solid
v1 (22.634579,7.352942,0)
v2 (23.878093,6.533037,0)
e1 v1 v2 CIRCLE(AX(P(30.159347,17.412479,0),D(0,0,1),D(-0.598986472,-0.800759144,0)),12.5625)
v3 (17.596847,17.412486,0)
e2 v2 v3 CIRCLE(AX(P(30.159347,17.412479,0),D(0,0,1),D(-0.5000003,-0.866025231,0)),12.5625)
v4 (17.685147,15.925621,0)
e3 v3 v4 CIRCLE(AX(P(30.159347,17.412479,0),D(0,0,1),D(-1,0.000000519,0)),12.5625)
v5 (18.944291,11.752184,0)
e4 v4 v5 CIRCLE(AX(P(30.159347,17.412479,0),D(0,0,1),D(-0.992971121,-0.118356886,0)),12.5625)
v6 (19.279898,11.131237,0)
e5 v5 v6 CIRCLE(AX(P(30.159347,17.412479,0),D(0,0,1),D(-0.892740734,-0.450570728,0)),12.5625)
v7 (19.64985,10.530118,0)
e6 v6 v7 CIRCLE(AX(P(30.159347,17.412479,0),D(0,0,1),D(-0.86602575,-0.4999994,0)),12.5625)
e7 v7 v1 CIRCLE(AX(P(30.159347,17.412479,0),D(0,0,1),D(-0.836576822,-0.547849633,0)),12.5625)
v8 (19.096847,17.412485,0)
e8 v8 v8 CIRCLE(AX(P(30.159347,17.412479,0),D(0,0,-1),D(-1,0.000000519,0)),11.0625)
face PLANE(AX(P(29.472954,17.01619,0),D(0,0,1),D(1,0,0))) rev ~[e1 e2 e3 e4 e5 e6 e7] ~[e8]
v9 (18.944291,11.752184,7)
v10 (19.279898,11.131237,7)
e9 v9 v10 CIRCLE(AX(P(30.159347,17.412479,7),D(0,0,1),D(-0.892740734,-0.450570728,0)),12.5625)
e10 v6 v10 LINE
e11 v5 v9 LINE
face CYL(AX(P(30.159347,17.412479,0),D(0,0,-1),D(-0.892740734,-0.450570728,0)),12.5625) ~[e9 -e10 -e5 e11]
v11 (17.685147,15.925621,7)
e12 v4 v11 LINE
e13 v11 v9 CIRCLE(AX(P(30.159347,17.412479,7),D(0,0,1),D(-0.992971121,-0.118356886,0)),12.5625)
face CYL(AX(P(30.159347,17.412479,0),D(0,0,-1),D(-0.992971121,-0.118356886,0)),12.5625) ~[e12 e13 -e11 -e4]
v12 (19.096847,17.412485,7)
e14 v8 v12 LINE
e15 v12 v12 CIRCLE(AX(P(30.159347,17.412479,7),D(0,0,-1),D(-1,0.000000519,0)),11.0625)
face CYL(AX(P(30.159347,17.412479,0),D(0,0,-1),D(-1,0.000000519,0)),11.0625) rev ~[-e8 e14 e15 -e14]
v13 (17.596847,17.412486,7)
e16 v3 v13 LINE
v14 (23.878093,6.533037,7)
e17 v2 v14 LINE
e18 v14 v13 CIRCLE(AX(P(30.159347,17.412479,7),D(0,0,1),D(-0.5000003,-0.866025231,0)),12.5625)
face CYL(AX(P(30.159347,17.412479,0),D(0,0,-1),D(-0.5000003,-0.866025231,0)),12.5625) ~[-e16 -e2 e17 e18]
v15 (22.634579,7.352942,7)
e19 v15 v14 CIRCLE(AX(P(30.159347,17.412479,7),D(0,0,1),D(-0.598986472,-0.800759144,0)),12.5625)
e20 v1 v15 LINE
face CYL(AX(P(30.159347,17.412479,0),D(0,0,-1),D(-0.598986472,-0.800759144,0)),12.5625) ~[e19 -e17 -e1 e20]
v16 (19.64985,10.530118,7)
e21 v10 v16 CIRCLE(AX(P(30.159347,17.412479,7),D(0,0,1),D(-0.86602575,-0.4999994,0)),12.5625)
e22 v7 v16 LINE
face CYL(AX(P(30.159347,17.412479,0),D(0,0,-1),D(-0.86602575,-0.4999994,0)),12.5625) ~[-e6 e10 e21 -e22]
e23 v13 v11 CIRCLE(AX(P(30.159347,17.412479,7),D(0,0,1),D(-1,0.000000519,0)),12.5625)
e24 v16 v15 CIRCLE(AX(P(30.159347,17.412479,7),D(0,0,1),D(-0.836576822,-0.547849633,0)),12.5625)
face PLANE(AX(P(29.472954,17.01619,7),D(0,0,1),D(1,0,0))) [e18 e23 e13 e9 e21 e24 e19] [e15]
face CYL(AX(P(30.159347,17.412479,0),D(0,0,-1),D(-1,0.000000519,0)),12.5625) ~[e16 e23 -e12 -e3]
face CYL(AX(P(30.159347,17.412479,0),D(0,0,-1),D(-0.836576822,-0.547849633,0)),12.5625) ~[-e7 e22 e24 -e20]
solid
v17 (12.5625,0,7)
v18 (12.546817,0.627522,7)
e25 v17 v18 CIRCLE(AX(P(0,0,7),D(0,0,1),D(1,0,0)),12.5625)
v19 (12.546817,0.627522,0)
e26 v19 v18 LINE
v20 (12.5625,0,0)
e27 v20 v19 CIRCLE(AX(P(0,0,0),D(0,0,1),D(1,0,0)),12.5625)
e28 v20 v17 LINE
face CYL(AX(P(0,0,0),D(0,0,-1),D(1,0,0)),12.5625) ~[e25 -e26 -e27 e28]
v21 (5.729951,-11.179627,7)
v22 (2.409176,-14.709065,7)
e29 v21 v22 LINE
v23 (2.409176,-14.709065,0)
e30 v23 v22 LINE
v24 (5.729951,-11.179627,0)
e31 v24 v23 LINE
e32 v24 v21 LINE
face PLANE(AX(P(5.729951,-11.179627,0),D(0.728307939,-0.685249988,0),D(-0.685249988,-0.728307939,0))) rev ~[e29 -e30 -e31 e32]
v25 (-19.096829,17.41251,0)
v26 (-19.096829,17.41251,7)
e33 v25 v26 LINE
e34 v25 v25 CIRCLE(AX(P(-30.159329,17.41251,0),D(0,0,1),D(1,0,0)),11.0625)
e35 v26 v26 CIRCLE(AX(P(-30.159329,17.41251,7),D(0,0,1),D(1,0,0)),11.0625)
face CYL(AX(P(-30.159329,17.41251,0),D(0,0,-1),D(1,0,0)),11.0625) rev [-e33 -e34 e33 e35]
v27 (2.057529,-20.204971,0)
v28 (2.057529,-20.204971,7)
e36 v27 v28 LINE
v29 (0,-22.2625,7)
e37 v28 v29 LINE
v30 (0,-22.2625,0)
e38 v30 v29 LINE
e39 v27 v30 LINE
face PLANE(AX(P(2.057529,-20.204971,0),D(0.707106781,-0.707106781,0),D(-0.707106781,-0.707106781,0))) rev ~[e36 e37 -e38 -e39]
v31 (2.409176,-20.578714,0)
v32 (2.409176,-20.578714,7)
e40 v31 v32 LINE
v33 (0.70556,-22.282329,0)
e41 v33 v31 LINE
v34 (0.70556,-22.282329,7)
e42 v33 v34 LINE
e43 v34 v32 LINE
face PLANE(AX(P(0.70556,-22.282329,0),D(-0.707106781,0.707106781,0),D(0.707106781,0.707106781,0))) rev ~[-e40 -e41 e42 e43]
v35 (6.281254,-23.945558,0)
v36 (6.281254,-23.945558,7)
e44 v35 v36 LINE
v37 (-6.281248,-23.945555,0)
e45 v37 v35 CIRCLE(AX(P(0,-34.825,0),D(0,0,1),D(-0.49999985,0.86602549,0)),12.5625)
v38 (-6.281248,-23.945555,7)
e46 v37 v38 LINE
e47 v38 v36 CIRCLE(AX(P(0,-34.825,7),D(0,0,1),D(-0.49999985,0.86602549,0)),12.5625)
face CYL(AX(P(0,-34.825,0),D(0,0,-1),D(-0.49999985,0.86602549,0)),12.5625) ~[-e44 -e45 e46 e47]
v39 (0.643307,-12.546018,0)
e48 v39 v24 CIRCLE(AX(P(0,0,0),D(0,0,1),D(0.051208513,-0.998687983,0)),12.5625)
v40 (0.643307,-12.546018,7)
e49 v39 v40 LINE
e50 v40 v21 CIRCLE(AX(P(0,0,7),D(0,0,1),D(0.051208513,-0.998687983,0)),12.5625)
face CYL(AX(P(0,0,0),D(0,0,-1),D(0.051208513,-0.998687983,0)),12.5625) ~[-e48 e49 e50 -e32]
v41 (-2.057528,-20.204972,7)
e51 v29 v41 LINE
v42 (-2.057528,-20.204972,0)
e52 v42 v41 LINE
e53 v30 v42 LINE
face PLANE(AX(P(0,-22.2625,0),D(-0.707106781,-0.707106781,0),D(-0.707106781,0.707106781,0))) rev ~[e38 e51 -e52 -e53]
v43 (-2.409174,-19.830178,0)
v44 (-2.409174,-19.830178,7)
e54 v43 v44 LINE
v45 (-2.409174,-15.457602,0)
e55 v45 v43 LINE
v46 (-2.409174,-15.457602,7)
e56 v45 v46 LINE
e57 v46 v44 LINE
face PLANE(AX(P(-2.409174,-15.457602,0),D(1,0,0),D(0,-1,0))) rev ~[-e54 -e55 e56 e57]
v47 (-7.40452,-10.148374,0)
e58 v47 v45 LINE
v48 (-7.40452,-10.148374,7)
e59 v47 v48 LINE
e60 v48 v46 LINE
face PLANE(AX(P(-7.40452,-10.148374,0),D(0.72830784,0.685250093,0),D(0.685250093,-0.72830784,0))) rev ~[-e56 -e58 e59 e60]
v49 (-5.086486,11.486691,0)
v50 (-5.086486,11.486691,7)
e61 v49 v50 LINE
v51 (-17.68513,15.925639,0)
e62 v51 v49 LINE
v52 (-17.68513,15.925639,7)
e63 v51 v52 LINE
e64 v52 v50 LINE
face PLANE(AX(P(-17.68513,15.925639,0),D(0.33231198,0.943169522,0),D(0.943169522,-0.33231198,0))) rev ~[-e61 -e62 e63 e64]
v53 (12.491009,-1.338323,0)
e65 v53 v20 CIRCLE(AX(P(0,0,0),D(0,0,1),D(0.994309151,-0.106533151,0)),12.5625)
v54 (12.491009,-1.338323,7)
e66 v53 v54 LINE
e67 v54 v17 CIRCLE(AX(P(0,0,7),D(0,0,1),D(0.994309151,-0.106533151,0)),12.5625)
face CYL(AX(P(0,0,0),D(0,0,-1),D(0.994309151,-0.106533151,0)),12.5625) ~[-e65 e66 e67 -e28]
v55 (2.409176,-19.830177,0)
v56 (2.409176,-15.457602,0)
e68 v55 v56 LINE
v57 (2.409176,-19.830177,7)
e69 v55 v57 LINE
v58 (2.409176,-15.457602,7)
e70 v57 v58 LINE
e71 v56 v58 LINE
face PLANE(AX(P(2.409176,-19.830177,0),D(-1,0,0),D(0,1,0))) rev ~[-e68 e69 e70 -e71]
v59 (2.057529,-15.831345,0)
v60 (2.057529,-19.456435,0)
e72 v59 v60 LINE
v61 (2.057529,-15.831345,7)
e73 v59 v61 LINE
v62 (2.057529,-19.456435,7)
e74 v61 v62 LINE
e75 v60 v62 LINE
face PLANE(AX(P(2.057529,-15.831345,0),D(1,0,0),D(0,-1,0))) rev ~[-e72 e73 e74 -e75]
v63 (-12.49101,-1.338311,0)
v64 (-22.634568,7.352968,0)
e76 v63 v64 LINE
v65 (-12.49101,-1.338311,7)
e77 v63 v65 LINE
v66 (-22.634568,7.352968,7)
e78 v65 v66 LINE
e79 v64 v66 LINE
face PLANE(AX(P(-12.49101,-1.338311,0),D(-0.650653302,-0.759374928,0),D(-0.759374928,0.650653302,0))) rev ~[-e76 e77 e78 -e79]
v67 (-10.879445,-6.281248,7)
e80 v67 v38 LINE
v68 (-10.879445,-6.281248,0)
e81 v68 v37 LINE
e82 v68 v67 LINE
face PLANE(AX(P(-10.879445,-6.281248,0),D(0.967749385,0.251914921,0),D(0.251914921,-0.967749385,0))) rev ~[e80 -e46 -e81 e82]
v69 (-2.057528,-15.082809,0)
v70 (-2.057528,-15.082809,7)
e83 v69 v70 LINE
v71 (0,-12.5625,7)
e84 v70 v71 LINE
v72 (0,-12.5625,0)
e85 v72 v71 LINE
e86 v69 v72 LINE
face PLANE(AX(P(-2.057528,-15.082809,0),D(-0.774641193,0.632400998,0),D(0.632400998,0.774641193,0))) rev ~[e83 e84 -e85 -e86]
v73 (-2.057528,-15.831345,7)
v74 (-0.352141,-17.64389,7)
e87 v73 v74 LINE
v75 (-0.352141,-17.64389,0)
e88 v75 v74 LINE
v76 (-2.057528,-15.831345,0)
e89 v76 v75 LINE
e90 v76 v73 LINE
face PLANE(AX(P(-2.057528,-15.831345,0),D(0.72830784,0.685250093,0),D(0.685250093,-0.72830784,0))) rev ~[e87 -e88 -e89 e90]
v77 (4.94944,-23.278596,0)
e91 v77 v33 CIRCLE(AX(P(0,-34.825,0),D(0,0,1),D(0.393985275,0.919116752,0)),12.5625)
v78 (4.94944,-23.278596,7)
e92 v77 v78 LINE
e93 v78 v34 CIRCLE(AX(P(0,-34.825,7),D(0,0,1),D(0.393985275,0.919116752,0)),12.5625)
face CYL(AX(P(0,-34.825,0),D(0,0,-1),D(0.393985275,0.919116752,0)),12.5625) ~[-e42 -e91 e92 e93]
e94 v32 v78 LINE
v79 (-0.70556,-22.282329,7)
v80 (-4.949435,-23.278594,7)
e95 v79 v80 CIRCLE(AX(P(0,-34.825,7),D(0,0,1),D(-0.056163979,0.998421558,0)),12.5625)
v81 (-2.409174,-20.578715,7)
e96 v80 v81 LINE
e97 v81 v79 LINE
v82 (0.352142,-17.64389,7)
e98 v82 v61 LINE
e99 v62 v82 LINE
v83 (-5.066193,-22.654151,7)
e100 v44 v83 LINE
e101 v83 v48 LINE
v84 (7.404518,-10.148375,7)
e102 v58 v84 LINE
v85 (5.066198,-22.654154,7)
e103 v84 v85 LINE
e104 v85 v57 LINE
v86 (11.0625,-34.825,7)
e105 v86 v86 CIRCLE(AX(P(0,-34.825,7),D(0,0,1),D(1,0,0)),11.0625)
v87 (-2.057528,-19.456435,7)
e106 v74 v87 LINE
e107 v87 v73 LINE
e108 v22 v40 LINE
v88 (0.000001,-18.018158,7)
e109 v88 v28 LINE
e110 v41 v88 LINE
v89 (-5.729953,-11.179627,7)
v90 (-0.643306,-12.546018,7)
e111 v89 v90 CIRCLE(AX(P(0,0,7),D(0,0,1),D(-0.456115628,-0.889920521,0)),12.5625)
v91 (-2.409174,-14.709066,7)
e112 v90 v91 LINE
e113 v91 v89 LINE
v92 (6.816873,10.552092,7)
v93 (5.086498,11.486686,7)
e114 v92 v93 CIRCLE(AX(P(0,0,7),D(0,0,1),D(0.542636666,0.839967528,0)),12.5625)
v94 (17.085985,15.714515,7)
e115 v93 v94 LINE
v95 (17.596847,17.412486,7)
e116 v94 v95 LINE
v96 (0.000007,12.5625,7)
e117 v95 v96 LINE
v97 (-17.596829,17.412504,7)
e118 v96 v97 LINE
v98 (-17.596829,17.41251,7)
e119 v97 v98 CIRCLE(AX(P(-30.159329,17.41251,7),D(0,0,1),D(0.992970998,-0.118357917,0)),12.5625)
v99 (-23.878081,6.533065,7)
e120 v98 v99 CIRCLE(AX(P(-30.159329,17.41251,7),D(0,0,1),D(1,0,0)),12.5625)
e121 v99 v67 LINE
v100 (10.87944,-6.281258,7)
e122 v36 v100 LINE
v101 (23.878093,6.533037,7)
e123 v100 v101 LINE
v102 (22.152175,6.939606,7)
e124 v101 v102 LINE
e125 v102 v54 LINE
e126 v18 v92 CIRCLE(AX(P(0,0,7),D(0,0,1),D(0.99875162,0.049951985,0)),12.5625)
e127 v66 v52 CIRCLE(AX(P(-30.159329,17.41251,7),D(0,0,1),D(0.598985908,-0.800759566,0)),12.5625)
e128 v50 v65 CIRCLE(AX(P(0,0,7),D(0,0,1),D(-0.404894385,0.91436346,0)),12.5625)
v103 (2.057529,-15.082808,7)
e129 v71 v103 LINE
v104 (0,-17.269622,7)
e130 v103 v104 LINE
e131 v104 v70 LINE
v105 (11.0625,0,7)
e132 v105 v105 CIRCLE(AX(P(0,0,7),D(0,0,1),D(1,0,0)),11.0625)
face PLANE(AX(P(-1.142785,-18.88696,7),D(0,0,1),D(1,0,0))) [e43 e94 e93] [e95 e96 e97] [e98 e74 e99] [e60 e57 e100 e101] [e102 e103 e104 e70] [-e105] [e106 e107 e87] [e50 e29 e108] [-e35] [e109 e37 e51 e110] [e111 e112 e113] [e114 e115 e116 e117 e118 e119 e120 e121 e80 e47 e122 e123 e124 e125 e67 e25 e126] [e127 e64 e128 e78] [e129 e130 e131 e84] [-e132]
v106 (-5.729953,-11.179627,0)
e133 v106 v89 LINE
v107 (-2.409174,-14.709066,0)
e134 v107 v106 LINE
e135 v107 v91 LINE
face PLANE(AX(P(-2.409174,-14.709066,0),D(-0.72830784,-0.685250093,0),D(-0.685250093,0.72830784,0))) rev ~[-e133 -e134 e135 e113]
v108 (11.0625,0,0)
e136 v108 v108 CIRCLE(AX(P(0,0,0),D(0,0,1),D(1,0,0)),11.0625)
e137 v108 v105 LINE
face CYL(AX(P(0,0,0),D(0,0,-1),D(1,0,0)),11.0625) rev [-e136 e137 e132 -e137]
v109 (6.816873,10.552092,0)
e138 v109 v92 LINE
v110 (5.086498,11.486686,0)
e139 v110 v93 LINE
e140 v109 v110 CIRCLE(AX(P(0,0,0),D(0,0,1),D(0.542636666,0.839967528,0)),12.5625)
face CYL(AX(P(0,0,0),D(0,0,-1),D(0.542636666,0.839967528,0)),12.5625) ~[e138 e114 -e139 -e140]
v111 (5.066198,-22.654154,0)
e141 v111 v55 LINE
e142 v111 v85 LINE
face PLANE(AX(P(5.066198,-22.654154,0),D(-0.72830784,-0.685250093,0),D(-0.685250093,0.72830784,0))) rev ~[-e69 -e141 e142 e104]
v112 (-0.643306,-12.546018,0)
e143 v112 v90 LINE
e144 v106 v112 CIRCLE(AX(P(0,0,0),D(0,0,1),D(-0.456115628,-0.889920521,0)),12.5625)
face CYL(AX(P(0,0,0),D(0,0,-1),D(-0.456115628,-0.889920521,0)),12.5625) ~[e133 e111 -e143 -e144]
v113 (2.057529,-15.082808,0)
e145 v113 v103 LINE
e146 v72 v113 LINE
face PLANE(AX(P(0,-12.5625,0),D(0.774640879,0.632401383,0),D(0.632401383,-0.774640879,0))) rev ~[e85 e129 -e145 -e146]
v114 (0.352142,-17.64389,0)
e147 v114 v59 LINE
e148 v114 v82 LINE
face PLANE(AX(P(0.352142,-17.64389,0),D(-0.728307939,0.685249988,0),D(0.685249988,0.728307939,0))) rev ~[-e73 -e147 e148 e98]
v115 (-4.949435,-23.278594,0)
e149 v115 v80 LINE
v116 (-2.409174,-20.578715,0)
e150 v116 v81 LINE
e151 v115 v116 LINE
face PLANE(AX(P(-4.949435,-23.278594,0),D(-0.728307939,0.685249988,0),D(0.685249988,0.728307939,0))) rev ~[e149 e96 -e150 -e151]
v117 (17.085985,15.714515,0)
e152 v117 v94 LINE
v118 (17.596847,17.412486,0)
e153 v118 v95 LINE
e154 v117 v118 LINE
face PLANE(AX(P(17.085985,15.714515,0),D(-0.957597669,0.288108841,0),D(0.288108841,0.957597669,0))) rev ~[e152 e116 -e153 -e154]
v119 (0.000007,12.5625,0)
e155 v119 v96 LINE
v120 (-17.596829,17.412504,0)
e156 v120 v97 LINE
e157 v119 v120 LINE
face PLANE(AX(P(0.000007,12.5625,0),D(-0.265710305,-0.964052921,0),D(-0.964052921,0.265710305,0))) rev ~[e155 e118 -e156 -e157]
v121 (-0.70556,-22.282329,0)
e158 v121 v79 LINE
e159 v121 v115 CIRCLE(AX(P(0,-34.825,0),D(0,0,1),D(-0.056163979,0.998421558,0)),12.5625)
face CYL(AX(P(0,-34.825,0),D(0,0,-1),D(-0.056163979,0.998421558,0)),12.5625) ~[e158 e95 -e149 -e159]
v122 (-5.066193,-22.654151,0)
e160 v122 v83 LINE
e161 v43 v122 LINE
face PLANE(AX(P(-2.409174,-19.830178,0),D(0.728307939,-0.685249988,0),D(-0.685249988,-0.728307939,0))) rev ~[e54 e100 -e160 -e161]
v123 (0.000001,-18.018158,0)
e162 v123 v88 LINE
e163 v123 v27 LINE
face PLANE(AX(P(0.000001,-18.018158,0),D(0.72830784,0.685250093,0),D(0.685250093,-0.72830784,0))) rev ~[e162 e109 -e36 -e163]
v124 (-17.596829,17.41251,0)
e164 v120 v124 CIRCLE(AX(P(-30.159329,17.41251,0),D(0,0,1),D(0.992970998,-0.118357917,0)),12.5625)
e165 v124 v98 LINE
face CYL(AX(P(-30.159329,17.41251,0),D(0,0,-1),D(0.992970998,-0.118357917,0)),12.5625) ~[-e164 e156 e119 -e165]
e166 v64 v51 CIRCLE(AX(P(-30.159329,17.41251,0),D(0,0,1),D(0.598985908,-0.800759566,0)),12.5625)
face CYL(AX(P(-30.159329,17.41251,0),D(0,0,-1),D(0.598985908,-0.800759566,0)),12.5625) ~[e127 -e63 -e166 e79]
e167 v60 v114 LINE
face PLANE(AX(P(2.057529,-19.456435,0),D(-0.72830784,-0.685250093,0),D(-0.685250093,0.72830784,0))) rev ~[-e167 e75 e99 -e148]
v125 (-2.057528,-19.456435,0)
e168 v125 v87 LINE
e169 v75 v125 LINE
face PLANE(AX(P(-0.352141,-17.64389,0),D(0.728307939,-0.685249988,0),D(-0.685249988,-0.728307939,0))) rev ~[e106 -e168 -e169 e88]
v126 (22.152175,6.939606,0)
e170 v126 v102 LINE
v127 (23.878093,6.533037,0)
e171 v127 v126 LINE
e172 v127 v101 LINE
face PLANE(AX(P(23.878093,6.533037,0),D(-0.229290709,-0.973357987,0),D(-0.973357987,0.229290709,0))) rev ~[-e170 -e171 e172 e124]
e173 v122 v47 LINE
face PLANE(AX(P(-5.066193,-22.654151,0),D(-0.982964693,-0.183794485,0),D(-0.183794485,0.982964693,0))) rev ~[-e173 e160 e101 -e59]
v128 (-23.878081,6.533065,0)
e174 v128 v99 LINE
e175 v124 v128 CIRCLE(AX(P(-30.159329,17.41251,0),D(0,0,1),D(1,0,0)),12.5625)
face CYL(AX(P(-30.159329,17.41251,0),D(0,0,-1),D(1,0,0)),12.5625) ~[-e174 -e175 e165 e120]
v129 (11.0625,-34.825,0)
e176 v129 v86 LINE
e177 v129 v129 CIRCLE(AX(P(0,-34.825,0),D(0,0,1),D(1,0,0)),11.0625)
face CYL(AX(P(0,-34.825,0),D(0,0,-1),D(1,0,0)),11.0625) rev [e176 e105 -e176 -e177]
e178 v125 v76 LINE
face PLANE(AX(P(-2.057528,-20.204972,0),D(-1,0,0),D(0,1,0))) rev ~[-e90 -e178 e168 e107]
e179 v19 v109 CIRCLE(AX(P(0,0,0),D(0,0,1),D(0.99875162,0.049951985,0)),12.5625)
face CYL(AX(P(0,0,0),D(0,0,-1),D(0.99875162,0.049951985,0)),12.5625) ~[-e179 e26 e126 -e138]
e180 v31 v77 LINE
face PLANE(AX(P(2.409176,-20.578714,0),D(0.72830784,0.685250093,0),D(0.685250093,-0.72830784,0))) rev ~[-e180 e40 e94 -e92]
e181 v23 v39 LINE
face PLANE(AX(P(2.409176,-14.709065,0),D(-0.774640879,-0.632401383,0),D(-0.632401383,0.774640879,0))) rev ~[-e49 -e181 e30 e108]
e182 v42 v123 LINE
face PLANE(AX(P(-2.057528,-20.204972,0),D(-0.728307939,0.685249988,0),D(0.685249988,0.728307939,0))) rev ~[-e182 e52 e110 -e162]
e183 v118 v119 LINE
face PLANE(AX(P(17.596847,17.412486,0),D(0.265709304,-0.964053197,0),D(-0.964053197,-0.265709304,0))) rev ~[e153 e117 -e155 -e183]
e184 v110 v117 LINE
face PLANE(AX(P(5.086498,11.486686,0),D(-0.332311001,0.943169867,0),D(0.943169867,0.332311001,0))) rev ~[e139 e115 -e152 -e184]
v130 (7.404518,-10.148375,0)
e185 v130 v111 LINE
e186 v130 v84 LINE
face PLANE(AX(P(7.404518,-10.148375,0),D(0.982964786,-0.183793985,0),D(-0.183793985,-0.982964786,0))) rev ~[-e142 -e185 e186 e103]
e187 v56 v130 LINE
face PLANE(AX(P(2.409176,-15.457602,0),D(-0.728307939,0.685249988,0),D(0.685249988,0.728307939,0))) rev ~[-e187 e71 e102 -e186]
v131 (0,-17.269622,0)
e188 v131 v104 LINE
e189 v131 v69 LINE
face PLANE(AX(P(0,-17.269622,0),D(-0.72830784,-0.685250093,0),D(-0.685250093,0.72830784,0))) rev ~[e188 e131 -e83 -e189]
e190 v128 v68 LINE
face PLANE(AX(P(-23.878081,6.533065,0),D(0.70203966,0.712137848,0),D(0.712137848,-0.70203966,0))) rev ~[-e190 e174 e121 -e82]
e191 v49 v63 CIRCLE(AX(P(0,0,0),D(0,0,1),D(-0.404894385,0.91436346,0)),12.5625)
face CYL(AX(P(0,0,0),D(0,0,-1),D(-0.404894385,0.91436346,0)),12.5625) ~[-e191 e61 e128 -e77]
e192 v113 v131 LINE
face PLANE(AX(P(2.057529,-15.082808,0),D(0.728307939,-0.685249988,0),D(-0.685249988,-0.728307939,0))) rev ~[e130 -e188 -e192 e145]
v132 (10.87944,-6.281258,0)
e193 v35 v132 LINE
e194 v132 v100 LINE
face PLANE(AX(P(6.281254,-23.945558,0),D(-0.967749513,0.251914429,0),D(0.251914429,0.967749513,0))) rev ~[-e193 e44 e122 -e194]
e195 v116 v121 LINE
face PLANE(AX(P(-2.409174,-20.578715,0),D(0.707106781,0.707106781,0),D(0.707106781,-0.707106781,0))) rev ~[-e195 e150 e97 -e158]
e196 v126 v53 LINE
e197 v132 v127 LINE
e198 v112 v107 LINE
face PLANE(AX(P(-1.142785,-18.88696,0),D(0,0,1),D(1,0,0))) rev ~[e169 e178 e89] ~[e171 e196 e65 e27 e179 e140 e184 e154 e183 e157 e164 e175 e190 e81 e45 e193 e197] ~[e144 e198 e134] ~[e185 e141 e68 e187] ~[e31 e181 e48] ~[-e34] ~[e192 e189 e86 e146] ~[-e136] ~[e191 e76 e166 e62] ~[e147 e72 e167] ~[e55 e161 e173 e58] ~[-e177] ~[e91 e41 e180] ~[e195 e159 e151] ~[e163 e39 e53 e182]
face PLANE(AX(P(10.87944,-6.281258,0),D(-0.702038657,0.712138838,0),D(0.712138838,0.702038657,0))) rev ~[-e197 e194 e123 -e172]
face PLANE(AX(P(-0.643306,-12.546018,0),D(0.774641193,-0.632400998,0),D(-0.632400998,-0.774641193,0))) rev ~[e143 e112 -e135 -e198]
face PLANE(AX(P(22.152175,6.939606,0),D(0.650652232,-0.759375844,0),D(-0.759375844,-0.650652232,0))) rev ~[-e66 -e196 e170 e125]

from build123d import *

# Parameters (mm, degrees)
F0_R     = 11.0625
F1_DEPTH = 7
F2_DEPTH = 7
F3_DEPTH = 7


# Not quite as in the source:
# - ends of sketch curves that miss each other by under 0.0002 mm in the source are joined


with BuildPart() as f1:
    # F0 (on Top) → F1 (new body)
    with BuildSketch(Plane.XY):
        with BuildLine():
            ThreePointArc((-22.6345681923, 7.3529683934), (-23.2441620991, 6.9245708082), (-23.878080543, 6.5330652161))
            Line((-23.878080543, 6.5330652161), (-10.879445222, -6.2812481173))
            ThreePointArc((-10.879445222, -6.2812481173), (-11.9437306049, -3.894060283), (-12.4910099647, -1.3383109926))
            Line((-12.4910099647, -1.3383109926), (-22.6345681923, 7.3529683934))
        make_face()
        with BuildLine():
            ThreePointArc((-17.6851304944, 15.925639103), (-17.6189235491, 16.6677649143), (-17.5968286604, 17.4125104381))
            ThreePointArc((-17.5968286604, 17.4125104381), (-41.0387722519, 23.6937613794), (-23.878080543, 6.5330652161))
            ThreePointArc((-23.878080543, 6.5330652161), (-23.2441620991, 6.9245708082), (-22.6345681923, 7.3529683934))
            ThreePointArc((-22.6345681923, 7.3529683934), (-19.2798866993, 11.1312566727), (-17.6851304944, 15.925639103))
        make_face()
        with Locations((-30.1593286604, 17.4125104381)):
            Circle(F0_R, mode=Mode.SUBTRACT)
        with BuildLine():
            Line((6.5218e-06, 12.5625), (-17.5968286604, 17.4125039163))
            ThreePointArc((-17.5968286604, 17.4125039163), (-17.6189235491, 16.6677649143), (-17.6851304944, 15.925639103))
            Line((-17.6851304944, 15.925639103), (-5.0864857136, 11.4866909655))
            ThreePointArc((-5.0864857136, 11.4866909655), (-2.5995016661, 12.2906060607), (6.5218e-06, 12.5625))
        make_face()
        with BuildLine():
            ThreePointArc((5.0864976401, 11.4866856842), (2.5995144273, 12.2906033616), (6.5218e-06, 12.5625))
            ThreePointArc((6.5218e-06, 12.5625), (-2.5995016661, 12.2906060607), (-5.0864857136, 11.4866909655))
            ThreePointArc((-5.0864857136, 11.4866909655), (-10.8794419611, 6.2812537653), (-12.4910099647, -1.3383109926))
            ThreePointArc((-12.4910099647, -1.3383109926), (-11.9437306049, -3.894060283), (-10.879445222, -6.2812481173))
            ThreePointArc((-10.879445222, -6.2812481173), (-9.3442233374, -8.3965407443), (-7.4045198124, -10.1483738893))
            ThreePointArc((-7.4045198124, -10.1483738893), (-6.5874472871, -10.6968193632), (-5.729952579, -11.1796265453))
            ThreePointArc((-5.729952579, -11.1796265453), (-3.2590434265, -12.1323963912), (-0.6433064868, -12.546017815))
            ThreePointArc((-0.6433064868, -12.546017815), (-0.3217587988, -12.5583787777), (0, -12.5625))
            ThreePointArc((0, -12.5625), (0.3217590306, -12.5583787718), (0.64330695, -12.5460177912))
            ThreePointArc((0.64330695, -12.5460177912), (3.2590426993, -12.1323965866), (5.7299508261, -11.1796274437))
            ThreePointArc((5.7299508261, -11.1796274437), (6.5874457148, -10.6968203315), (7.4045184202, -10.1483749051))
            ThreePointArc((7.4045184202, -10.1483749051), (9.3442190031, -8.3965455678), (10.879439599, -6.2812578567))
            ThreePointArc((10.879439599, -6.2812578567), (11.9437270351, -3.894071232), (12.491008709, -1.3383227122))
            ThreePointArc((12.491008709, -1.3383227122), (12.5446144452, -0.6701154167), (12.5625, 0))
            ThreePointArc((12.5625, 0), (12.5585786957, 0.3138588742), (12.546817231, 0.6275218102))
            ThreePointArc((12.546817231, 0.6275218102), (10.8794485026, 6.2812424352), (6.816873119, 10.5520920736))
            ThreePointArc((6.816873119, 10.5520920736), (5.9700021073, 11.0533018184), (5.0864976401, 11.4866856842))
        make_face()
        Circle(F0_R, mode=Mode.SUBTRACT)
        with BuildLine():
            Line((17.5968467396, 17.4124856456), (6.5218e-06, 12.5625))
            ThreePointArc((6.5218e-06, 12.5625), (2.5995144273, 12.2906033616), (5.0864976401, 11.4866856842))
            Line((5.0864976401, 11.4866856842), (17.0859847543, 15.7145153795))
            Line((17.0859847543, 15.7145153795), (17.5968467396, 17.4124856456))
        make_face()
        with BuildLine():
            Line((10.879439599, -6.2812578567), (23.8780929743, 6.5330371628))
            Line((23.8780929743, 6.5330371628), (22.1521745654, 6.9396060316))
            Line((22.1521745654, 6.9396060316), (12.491008709, -1.3383227122))
            ThreePointArc((12.491008709, -1.3383227122), (11.9437270351, -3.894071232), (10.879439599, -6.2812578567))
        make_face()
        with BuildLine():
            ThreePointArc((-4.9494347308, -23.2785935419), (-5.6252349846, -23.5923183247), (-6.2812481173, -23.945554778))
            ThreePointArc((-6.2812481173, -23.945554778), (-6.2812509413, -45.7044435916), (12.5625, -34.825))
            ThreePointArc((12.5625, -34.825), (10.879445222, -28.5437518827), (6.2812537653, -23.9455580389))
            ThreePointArc((6.2812537653, -23.9455580389), (5.6252404686, -23.5923210711), (4.949440011, -23.2785958053))
            ThreePointArc((4.949440011, -23.2785958053), (2.8710438959, -22.5949749306), (0.7055599905, -22.282329178))
            ThreePointArc((0.7055599905, -22.282329178), (0.3529192884, -22.267458273), (0, -22.2625))
            ThreePointArc((0, -22.2625), (-0.3529192884, -22.267458273), (-0.7055599905, -22.282329178))
            ThreePointArc((-0.7055599905, -22.282329178), (-2.8710410995, -22.5949742742), (-4.9494347308, -23.2785935419))
        make_face()
        with Locations((0, -34.825)):
            Circle(F0_R, mode=Mode.SUBTRACT)
        with BuildLine():
            Line((6.2812537653, -23.9455580389), (10.879439599, -6.2812578567))
            ThreePointArc((10.879439599, -6.2812578567), (9.3442190031, -8.3965455678), (7.4045184202, -10.1483749051))
            Line((7.4045184202, -10.1483749051), (5.0661976857, -22.6541538095))
            Line((5.0661976857, -22.6541538095), (6.2812537653, -23.9455580389))
        make_face()
        with BuildLine():
            ThreePointArc((-7.4045198124, -10.1483738893), (-9.3442233374, -8.3965407443), (-10.879445222, -6.2812481173))
            Line((-10.879445222, -6.2812481173), (-6.2812481173, -23.945554778))
            Line((-6.2812481173, -23.945554778), (-5.0661928327, -22.6541510186))
            Line((-5.0661928327, -22.6541510186), (-7.4045198124, -10.1483738893))
        make_face()
        with BuildLine():
            ThreePointArc((4.949440011, -23.2785958053), (5.6252404686, -23.5923210711), (6.2812537653, -23.9455580389))
            Line((6.2812537653, -23.9455580389), (5.0661976857, -22.6541538095))
            Line((5.0661976857, -22.6541538095), (4.949440011, -23.2785958053))
        make_face()
        with BuildLine():
            Line((-5.0661928327, -22.6541510186), (-6.2812481173, -23.945554778))
            ThreePointArc((-6.2812481173, -23.945554778), (-5.6252349846, -23.5923183247), (-4.9494347308, -23.2785935419))
            Line((-4.9494347308, -23.2785935419), (-5.0661928327, -22.6541510186))
        make_face()
    extrude(amount=F1_DEPTH)

    # F0 (on Top) → F2 (join)
    with BuildSketch(Plane.XY):
        with BuildLine():
            Line((2.0575288422, -20.2049711578), (0, -22.2625))
            ThreePointArc((0, -22.2625), (0.3529192884, -22.267458273), (0.7055599905, -22.282329178))
            Line((0.7055599905, -22.282329178), (2.4091755513, -20.5787136171))
            Line((2.4091755513, -20.5787136171), (2.0575288422, -20.2049711578))
        make_face()
        with BuildLine():
            Line((-2.4091743081, -20.5787148604), (-0.7055599905, -22.282329178))
            ThreePointArc((-0.7055599905, -22.282329178), (-0.3529192884, -22.267458273), (0, -22.2625))
            Line((0, -22.2625), (-2.0575276516, -20.2049723484))
            Line((-2.0575276516, -20.2049723484), (-2.4091743081, -20.5787148604))
        make_face()
        Polygon((-2.0575276516, -19.4564351822), (-2.4091743081, -19.8301776941), (-2.4091743081, -20.5787148604), (-2.0575276516, -20.2049723484), align=None)
        Polygon((2.0575288422, -19.456435009), (2.0575288422, -20.2049711578), (2.4091755513, -20.5787136171), (2.4091755513, -19.8301774684), align=None)
        Polygon((2.0575288422, -15.8313446679), (2.4091755513, -15.4576021), (2.4091755513, -14.7090649338), (2.0575288422, -15.0828075016), align=None)
        Polygon((-2.4091743081, -14.709066195), (-2.4091743081, -15.4576023437), (-2.0575276516, -15.8313447471), (-2.0575276516, -15.0828085984), align=None)
        Polygon((-2.0575276516, -15.8313447471), (-2.4091743081, -15.4576023437), (-2.4091743081, -19.8301776941), (-2.0575276516, -19.4564351822), align=None)
        Polygon((2.4091755513, -19.8301774684), (2.4091755513, -15.4576021), (2.0575288422, -15.8313446679), (2.0575288422, -19.456435009), align=None)
        with BuildLine():
            ThreePointArc((0, -12.5625), (-0.3217587988, -12.5583787777), (-0.6433064868, -12.546017815))
            Line((-0.6433064868, -12.546017815), (-2.4091743081, -14.709066195))
            Line((-2.4091743081, -14.709066195), (-2.0575276516, -15.0828085984))
            Line((-2.0575276516, -15.0828085984), (0, -12.5625))
        make_face()
        with BuildLine():
            ThreePointArc((0.64330695, -12.5460177912), (0.3217590306, -12.5583787718), (0, -12.5625))
            Line((0, -12.5625), (2.0575288422, -15.0828075016))
            Line((2.0575288422, -15.0828075016), (2.4091755513, -14.7090649338))
            Line((2.4091755513, -14.7090649338), (0.64330695, -12.5460177912))
        make_face()
        Polygon((2.4091755513, -20.5787136171), (4.949440011, -23.2785958053), (5.0661976857, -22.6541538095), (2.4091755513, -19.8301774684), align=None)
        Polygon((-2.4091743081, -19.8301776941), (-5.0661928327, -22.6541510186), (-4.9494347308, -23.2785935419), (-2.4091743081, -20.5787148604), align=None)
        with BuildLine():
            Line((2.4091755513, -15.4576021), (7.4045184202, -10.1483749051))
            ThreePointArc((7.4045184202, -10.1483749051), (6.5874457148, -10.6968203315), (5.7299508261, -11.1796274437))
            Line((5.7299508261, -11.1796274437), (2.4091755513, -14.7090649338))
            Line((2.4091755513, -14.7090649338), (2.4091755513, -15.4576021))
        make_face()
        with BuildLine():
            ThreePointArc((-5.729952579, -11.1796265453), (-6.5874472871, -10.6968193632), (-7.4045198124, -10.1483738893))
            Line((-7.4045198124, -10.1483738893), (-2.4091743081, -15.4576023437))
            Line((-2.4091743081, -15.4576023437), (-2.4091743081, -14.709066195))
            Line((-2.4091743081, -14.709066195), (-5.729952579, -11.1796265453))
        make_face()
        Polygon((0.3521420553, -17.6438901016), (8.567e-07, -18.0181582303), (2.0575288422, -20.2049711578), (2.0575288422, -19.456435009), align=None)
        Polygon((3.781e-07, -17.2696215728), (-0.3521408205, -17.6438897015), (8.567e-07, -18.0181582303), (0.3521420553, -17.6438901016), align=None)
        Polygon((2.0575288422, -15.8313446679), (2.0575288422, -15.0828075016), (3.781e-07, -17.2696215728), (0.3521420553, -17.6438901016), align=None)
    extrude(amount=F2_DEPTH)

    # F0 (on Top) → F3 (join)
    with BuildSketch(Plane.XY):
        Polygon((-0.3521408205, -17.6438897015), (-2.0575276516, -19.4564351822), (-2.0575276516, -20.2049723484), (8.567e-07, -18.0181582303), align=None)
        Polygon((-2.0575276516, -15.0828085984), (-2.0575276516, -15.8313447471), (-0.3521408205, -17.6438897015), (3.781e-07, -17.2696215728), align=None)
    extrude(amount=F3_DEPTH)


with BuildPart() as f1b:
    # F0 (on Top) → F1, piece 2 (new body)
    with BuildSketch(Plane.XY):
        with BuildLine():
            ThreePointArc((42.7218467396, 17.4124791239), (30.1593500005, 29.9749791239), (17.5968467396, 17.4124856456))
            ThreePointArc((17.5968467396, 17.4124856456), (17.6189410484, 16.6677433655), (17.6851470299, 15.9256207407))
            ThreePointArc((17.6851470299, 15.9256207407), (18.1323107106, 13.7838691135), (18.9442912632, 11.7521843515))
            ThreePointArc((18.9442912632, 11.7521843515), (19.1077328162, 11.4393529795), (19.2798982567, 11.1312366546))
            ThreePointArc((19.2798982567, 11.1312366546), (19.4606516814, 10.8280785967), (19.6498504077, 10.5301181118))
            ThreePointArc((19.6498504077, 10.5301181118), (21.0033498024, 8.8110765443), (22.6345791818, 7.3529423825))
            ThreePointArc((22.6345791818, 7.3529423825), (23.2441737601, 6.9245437258), (23.8780929743, 6.5330371628))
            ThreePointArc((23.8780929743, 6.5330371628), (36.4405948569, 6.5330339019), (42.7218467396, 17.4124791239))
        make_face()
        with BuildLine():
            ThreePointArc((41.2218467396, 17.4124791239), (30.1593438681, 6.3499791239), (19.0968467396, 17.4124848669))
            ThreePointArc((19.0968467396, 17.4124848669), (30.1593496111, 28.4749791239), (41.2218467396, 17.4124791239))
        make_face(mode=Mode.SUBTRACT)
    extrude(amount=F1_DEPTH)


solid = Compound([f1.part, f1b.part])
